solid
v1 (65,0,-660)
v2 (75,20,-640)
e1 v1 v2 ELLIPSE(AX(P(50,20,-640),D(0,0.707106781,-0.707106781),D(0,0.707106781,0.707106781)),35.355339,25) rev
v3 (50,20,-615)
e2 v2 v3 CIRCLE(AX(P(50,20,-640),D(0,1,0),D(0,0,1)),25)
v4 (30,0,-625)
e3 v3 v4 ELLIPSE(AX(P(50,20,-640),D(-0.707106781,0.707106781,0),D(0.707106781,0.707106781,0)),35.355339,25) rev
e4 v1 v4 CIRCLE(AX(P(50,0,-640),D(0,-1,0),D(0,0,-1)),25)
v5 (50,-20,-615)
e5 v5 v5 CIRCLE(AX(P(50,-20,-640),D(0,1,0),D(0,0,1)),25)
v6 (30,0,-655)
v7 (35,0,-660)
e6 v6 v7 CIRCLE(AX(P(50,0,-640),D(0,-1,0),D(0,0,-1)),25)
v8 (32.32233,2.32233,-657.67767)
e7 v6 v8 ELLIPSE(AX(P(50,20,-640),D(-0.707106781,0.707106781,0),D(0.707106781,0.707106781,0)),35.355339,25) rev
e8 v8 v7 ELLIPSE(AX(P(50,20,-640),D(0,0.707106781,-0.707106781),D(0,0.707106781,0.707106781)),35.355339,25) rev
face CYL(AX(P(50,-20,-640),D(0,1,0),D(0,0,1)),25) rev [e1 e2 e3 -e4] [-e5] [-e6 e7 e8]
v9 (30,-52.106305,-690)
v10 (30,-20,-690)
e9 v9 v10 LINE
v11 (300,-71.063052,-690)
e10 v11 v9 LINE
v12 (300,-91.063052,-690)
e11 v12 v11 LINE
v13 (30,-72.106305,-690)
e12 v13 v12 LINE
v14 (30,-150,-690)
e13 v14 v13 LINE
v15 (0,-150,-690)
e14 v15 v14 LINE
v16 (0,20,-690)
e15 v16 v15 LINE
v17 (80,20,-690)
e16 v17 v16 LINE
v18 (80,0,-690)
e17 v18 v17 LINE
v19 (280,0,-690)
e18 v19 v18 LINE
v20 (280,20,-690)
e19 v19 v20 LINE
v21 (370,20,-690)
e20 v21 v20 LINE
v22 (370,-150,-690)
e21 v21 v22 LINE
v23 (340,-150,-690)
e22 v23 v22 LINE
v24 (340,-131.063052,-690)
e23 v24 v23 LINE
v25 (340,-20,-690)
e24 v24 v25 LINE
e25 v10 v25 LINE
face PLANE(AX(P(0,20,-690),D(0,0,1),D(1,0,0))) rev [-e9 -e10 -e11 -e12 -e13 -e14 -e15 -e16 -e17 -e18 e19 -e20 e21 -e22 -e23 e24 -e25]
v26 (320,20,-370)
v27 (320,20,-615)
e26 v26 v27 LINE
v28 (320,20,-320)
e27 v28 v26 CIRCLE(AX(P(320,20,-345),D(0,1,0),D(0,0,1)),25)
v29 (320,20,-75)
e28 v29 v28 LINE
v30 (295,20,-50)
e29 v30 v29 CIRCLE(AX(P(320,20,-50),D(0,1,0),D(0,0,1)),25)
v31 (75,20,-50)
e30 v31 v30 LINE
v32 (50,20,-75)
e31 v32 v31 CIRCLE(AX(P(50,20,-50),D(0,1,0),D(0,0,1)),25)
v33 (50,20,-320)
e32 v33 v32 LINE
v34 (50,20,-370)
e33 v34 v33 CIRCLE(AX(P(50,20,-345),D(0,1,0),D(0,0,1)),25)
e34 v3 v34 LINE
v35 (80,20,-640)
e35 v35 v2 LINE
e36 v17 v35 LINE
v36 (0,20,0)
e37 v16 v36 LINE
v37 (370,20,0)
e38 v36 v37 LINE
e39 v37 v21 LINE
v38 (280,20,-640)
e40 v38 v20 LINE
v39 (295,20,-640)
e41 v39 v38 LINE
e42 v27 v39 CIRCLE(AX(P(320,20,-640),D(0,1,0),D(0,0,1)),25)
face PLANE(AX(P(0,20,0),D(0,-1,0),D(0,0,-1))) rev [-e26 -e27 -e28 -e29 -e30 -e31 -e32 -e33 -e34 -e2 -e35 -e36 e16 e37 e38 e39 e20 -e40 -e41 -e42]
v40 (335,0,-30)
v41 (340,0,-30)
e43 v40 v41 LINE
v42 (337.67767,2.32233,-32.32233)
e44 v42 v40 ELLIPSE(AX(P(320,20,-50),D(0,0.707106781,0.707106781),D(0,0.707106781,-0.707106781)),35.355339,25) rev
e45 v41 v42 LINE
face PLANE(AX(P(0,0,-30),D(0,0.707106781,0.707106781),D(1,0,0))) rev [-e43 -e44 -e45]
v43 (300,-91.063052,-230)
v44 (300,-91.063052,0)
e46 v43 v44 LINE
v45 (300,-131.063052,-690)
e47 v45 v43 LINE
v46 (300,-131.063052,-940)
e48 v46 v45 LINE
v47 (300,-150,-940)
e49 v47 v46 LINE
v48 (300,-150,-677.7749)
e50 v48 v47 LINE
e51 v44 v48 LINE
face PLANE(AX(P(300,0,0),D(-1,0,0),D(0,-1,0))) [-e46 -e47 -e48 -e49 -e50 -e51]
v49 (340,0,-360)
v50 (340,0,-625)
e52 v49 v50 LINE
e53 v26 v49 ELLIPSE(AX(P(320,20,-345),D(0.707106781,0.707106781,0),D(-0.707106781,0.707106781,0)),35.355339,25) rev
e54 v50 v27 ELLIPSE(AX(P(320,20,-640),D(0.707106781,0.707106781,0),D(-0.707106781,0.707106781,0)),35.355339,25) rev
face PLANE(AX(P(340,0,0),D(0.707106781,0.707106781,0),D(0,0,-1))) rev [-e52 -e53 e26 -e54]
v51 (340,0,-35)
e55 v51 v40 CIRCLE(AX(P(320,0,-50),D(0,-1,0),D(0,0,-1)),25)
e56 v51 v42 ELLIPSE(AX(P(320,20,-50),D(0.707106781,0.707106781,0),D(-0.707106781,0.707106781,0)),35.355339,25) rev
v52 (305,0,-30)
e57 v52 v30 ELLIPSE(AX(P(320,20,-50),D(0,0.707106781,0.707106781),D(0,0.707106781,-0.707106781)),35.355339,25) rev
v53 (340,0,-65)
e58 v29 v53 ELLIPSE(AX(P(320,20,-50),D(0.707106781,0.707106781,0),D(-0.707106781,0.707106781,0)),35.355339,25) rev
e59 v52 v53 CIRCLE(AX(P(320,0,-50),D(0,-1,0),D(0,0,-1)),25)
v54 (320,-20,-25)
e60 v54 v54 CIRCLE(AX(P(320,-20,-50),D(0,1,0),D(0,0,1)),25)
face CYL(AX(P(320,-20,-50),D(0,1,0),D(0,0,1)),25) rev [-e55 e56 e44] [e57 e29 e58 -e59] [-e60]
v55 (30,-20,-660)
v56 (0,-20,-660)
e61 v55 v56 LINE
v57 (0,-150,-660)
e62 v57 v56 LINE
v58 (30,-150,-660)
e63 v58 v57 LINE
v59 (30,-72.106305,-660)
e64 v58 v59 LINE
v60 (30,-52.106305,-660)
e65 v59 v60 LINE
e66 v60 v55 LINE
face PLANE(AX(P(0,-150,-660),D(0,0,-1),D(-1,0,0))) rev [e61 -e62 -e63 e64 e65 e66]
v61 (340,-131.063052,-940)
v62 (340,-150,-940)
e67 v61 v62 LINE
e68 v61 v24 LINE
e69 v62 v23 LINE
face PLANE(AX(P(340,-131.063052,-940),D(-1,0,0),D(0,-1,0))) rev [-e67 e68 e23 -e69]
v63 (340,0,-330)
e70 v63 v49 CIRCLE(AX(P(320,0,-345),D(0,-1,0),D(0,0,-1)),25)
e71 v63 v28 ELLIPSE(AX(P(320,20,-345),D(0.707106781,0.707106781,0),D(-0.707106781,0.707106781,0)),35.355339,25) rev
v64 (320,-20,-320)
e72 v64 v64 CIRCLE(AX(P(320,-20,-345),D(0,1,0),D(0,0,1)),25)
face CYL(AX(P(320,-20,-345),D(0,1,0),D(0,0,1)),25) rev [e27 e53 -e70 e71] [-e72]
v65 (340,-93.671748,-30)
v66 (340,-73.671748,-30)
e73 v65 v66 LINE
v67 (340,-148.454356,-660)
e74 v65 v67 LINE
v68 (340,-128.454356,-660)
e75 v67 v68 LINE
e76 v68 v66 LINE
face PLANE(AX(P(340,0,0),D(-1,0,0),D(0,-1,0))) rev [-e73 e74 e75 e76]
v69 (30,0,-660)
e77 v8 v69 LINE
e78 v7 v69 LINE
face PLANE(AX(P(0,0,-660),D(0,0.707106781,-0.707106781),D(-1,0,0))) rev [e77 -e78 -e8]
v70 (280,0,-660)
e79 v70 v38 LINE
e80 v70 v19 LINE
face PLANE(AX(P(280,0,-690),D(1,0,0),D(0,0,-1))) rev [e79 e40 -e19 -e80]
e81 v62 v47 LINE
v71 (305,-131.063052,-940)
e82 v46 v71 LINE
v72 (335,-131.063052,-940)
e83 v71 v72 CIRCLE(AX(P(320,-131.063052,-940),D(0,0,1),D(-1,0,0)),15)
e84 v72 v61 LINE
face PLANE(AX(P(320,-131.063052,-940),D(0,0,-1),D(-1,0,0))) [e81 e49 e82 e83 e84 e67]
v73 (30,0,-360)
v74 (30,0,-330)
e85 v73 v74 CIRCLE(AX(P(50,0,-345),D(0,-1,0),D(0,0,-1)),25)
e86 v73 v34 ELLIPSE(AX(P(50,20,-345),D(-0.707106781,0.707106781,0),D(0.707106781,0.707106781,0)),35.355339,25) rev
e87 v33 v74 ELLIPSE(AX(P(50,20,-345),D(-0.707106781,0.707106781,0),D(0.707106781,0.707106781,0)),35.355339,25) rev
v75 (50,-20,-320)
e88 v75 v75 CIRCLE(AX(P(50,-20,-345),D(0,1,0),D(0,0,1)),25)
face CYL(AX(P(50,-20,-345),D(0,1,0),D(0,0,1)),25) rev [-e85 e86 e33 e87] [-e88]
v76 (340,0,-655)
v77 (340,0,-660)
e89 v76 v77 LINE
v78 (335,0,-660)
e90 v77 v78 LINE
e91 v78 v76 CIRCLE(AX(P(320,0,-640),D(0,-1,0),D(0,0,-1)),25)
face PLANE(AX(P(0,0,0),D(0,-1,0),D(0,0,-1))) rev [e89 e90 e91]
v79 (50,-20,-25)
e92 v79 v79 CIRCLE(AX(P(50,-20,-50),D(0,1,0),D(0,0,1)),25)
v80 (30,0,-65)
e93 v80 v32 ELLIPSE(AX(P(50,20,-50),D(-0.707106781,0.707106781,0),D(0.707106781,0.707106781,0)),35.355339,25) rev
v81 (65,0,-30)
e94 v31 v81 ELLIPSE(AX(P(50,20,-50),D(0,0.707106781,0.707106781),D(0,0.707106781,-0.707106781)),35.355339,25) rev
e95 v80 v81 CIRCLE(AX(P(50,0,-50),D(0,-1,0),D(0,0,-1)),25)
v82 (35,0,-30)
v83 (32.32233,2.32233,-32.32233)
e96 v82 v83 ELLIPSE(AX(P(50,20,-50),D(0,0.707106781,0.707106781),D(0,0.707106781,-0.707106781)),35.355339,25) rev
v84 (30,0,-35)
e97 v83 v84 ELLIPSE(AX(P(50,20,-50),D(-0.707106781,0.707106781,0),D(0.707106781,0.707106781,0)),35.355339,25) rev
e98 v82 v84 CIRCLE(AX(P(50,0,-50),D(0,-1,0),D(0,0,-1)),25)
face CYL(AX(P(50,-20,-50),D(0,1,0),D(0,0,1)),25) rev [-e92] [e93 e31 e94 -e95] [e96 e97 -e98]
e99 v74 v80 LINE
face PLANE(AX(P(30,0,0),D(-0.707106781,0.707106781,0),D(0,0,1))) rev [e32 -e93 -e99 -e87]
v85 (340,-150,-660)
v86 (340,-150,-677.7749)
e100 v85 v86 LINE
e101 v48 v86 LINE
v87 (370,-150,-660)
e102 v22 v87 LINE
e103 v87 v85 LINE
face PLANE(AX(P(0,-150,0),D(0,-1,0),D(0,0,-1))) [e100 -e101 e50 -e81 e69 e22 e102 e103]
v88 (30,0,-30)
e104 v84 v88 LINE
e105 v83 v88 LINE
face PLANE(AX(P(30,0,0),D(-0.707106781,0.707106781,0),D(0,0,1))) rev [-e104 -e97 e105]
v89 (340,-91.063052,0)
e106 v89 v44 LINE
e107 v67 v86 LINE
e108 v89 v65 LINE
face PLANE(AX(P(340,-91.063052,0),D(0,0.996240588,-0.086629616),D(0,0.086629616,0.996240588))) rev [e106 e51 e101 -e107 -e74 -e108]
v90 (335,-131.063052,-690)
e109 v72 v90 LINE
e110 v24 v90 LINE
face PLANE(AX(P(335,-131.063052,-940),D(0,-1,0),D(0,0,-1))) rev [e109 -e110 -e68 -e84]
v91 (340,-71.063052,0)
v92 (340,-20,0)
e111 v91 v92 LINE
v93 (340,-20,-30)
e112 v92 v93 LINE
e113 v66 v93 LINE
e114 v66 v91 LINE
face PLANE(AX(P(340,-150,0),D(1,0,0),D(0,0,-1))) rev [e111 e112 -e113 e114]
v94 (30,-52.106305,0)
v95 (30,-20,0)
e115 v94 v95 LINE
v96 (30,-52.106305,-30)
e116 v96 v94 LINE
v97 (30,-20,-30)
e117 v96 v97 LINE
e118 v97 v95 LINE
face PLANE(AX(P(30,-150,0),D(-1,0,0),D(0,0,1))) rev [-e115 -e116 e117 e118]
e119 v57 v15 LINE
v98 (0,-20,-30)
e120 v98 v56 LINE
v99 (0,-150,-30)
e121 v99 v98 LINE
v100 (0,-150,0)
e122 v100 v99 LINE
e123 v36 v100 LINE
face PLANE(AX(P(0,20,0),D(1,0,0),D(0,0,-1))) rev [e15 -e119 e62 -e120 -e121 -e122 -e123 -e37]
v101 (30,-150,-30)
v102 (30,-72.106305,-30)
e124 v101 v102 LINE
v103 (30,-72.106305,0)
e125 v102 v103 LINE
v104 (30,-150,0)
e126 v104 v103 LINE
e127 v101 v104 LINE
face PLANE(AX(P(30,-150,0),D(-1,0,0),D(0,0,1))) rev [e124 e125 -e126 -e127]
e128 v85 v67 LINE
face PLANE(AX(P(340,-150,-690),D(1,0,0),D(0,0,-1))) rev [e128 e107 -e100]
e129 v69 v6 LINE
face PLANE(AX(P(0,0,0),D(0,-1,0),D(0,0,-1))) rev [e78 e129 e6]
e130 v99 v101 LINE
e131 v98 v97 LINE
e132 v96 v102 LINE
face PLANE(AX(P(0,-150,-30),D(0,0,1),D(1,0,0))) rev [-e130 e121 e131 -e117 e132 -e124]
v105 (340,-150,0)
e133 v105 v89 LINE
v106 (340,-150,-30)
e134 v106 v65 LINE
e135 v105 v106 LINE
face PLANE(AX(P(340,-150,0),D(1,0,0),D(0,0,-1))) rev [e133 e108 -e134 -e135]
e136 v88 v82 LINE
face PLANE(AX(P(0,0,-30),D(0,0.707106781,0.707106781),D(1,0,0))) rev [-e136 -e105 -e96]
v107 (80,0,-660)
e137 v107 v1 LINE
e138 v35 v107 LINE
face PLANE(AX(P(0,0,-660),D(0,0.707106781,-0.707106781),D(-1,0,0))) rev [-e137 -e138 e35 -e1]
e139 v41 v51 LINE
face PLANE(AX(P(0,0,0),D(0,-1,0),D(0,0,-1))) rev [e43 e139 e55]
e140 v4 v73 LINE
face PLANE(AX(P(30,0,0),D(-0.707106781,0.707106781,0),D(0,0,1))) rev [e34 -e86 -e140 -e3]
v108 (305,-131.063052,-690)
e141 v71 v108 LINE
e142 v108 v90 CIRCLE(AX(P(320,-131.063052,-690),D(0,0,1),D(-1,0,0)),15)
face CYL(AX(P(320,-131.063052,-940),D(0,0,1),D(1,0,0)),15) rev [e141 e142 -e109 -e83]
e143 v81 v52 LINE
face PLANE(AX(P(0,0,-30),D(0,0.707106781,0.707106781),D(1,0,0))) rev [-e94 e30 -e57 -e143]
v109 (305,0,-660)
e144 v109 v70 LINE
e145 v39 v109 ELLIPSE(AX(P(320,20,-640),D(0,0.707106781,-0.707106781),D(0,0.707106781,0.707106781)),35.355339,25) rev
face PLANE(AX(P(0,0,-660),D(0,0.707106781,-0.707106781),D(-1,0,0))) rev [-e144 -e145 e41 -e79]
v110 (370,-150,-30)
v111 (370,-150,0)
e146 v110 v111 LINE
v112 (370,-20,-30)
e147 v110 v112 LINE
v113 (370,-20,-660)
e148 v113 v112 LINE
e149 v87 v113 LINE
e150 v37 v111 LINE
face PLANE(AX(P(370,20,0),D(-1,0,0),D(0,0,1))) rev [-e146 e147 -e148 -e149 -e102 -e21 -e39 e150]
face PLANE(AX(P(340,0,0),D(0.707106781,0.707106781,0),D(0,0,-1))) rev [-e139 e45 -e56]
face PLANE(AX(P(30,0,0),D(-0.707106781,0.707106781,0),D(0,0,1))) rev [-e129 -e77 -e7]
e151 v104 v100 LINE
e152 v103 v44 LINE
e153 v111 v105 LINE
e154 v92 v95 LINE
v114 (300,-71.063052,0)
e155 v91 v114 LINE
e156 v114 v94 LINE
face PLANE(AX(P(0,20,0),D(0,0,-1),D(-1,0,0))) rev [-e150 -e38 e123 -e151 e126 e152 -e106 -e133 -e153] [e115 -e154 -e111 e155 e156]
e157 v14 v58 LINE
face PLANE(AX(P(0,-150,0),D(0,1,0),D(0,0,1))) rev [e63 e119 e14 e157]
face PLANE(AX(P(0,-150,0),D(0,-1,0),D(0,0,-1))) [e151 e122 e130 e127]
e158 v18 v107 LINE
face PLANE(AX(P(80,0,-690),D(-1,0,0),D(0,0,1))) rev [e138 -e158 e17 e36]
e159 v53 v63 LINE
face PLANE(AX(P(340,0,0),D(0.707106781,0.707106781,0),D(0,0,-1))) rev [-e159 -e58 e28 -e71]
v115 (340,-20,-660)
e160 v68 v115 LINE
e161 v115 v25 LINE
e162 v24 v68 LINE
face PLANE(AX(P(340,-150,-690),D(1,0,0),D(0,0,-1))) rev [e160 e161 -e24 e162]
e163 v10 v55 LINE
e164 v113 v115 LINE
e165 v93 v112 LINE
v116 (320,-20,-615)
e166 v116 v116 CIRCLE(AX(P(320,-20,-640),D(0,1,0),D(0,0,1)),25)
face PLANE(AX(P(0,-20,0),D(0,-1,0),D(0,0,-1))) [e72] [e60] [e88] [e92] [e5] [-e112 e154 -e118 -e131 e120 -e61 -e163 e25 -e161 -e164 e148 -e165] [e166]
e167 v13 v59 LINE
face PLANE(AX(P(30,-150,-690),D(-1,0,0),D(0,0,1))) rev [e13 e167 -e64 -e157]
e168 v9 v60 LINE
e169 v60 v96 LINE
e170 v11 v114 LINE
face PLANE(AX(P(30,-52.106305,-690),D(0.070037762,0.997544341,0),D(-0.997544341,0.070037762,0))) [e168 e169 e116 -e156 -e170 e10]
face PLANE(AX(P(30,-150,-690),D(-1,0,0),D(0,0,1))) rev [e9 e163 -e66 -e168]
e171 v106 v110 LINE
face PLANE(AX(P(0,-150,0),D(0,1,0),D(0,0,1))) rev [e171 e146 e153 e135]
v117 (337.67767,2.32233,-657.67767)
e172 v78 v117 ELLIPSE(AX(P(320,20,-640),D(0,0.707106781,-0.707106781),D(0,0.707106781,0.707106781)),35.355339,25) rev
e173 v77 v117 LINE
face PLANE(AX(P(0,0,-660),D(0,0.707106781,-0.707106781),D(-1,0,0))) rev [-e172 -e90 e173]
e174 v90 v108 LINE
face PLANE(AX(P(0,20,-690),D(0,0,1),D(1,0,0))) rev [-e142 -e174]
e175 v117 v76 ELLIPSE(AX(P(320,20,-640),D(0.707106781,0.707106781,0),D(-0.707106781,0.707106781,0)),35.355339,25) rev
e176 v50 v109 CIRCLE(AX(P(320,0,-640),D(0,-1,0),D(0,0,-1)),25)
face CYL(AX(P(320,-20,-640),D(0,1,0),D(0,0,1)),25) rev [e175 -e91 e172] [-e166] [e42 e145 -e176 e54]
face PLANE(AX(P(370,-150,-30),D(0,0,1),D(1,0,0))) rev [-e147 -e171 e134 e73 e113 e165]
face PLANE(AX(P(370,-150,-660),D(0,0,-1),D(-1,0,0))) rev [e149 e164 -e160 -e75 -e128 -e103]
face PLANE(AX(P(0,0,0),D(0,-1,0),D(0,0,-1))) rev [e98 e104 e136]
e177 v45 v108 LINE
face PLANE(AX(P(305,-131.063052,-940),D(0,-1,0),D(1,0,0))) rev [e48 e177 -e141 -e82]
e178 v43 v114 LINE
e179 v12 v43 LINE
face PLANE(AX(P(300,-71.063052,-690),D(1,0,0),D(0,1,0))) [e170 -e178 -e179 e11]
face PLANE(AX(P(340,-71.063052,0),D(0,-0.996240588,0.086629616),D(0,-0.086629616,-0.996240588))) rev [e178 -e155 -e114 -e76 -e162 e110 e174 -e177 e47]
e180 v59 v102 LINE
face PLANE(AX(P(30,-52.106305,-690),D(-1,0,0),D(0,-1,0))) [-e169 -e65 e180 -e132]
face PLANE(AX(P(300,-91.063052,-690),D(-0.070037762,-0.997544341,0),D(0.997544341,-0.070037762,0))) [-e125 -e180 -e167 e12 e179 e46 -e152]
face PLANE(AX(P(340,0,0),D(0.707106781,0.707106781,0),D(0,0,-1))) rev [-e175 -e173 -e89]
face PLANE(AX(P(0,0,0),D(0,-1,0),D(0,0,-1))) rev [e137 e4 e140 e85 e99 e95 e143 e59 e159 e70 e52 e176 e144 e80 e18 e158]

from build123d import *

# Parameters (mm, degrees)
SKETCH2_W            = 370
SKETCH2_H            = 690
SKETCH2_W_2          = 270
SKETCH2_H_2          = 590
BOSS_EXTRUDE1_DEPTH  = 20
CHAMFER1_SIZE        = 20
SKETCH10_W           = 370
SKETCH10_H           = 690
BOSS_EXTRUDE6_DEPTH  = 20
CUT_EXTRUDE3_DEPTH   = 784.964284901
SKETCH11_W           = 30
SKETCH11_H           = 30
BOSS_EXTRUDE7_DEPTH  = 130
SKETCH13_W           = 200
SKETCH13_H           = 50
CUT_EXTRUDE4_DEPTH   = 20
BOSS_EXTRUDE11_DEPTH = 690
BOSS_EXTRUDE15_DEPTH = 40
SKETCH21_W           = 0.428939058
SKETCH21_H           = 0.058642304
SKETCH21_W_2         = 75.212075904
SKETCH21_H_2         = 45.043559158
CUT_EXTRUDE6_DEPTH   = 17
BOSS_EXTRUDE16_DEPTH = 250


with BuildPart() as part:
    # Sketch2 → Boss-Extrude1 (new body)
    with BuildSketch(Plane(origin=(0, 0, 0), x_dir=(1, 0, 0), z_dir=(0, 1, 0))):
        with Locations((185, 345)):
            Rectangle(SKETCH2_W, SKETCH2_H)
        with Locations((185, 345)):
            Rectangle(SKETCH2_W_2, SKETCH2_H_2, mode=Mode.SUBTRACT)
    extrude(amount=BOSS_EXTRUDE1_DEPTH)

    # Chamfer1
    chamfer1_edges = [part.edges().sort_by_distance(p)[0] for p in [
        (185, 0, -640),
        (320, 0, -345),
        (185, 0, -50),
        (50, 0, -345),
    ]]
    chamfer(chamfer1_edges, length=CHAMFER1_SIZE - 0.0001)  # a hair under: the kernel refuses the full size

    # Sketch10 → Boss-Extrude6 (add)
    with BuildSketch(Plane.XZ):
        with Locations((185, -345)):
            Rectangle(SKETCH10_W, SKETCH10_H)
    extrude(amount=BOSS_EXTRUDE6_DEPTH)

    # Sketch4 → Cut-Extrude3 (cut, through all)
    with BuildSketch(Plane(origin=(0, 20, 0), x_dir=(1, 0, 0), z_dir=(0, 1, 0))):
        with BuildLine():
            ThreePointArc((320, 615), (337.67766953, 622.32233047), (345, 640))
            ThreePointArc((345, 640), (320, 665), (295, 640))
            Line((295, 640), (320, 640))
            Line((320, 640), (320, 615))
        make_face()
        with BuildLine():
            Line((320, 640), (295, 640))
            ThreePointArc((295, 640), (302.32233047, 622.32233047), (320, 615))
            Line((320, 615), (320, 640))
        make_face()
        with BuildLine():
            Line((50, 640), (75, 640))
            ThreePointArc((75, 640), (32.32233047, 657.67766953), (50, 615))
            Line((50, 615), (50, 640))
        make_face()
        with BuildLine():
            ThreePointArc((50, 615), (67.67766953, 622.32233047), (75, 640))
            Line((75, 640), (50, 640))
            Line((50, 640), (50, 615))
        make_face()
        with BuildLine():
            Line((50, 320), (50, 370))
            ThreePointArc((50, 370), (25, 345), (50, 320))
        make_face()
        with BuildLine():
            ThreePointArc((75, 345), (67.67766953, 362.67766953), (50, 370))
            Line((50, 370), (50, 320))
            ThreePointArc((50, 320), (67.67766953, 327.32233047), (75, 345))
        make_face()
        with BuildLine():
            Line((50, 50), (50, 75))
            ThreePointArc((50, 75), (32.32233047, 32.32233047), (75, 50))
            Line((75, 50), (50, 50))
        make_face()
        with BuildLine():
            ThreePointArc((75, 50), (67.67766953, 67.67766953), (50, 75))
            Line((50, 75), (50, 50))
            Line((50, 50), (75, 50))
        make_face()
        with BuildLine():
            Line((320, 50), (320, 75))
            ThreePointArc((320, 75), (302.32233047, 67.67766953), (295, 50))
            Line((295, 50), (320, 50))
        make_face()
        with BuildLine():
            ThreePointArc((345, 50), (337.67766953, 67.67766953), (320, 75))
            Line((320, 75), (320, 50))
            Line((320, 50), (295, 50))
            ThreePointArc((295, 50), (320, 25), (345, 50))
        make_face()
        with BuildLine():
            Line((320, 320), (320, 370))
            ThreePointArc((320, 370), (295, 345), (320, 320))
        make_face()
        with BuildLine():
            ThreePointArc((345, 345), (337.67766953, 362.67766953), (320, 370))
            Line((320, 370), (320, 320))
            ThreePointArc((320, 320), (337.67766953, 327.32233047), (345, 345))
        make_face()
    extrude(amount=-CUT_EXTRUDE3_DEPTH, mode=Mode.SUBTRACT)

    # Sketch11 → Boss-Extrude7 (add)
    with BuildSketch(Plane.XZ.offset(20)):
        with Locations((15, -15)):
            Rectangle(SKETCH11_W, SKETCH11_H)
        with Locations((355, -15)):
            Rectangle(SKETCH11_W, SKETCH11_H)
        with Locations((15, -675)):
            Rectangle(SKETCH11_W, SKETCH11_H)
        with Locations((355, -675)):
            Rectangle(SKETCH11_W, SKETCH11_H)
    extrude(amount=BOSS_EXTRUDE7_DEPTH)

    # Sketch13 → Cut-Extrude4 (cut)
    with BuildSketch(Plane(origin=(0, 20, 0), x_dir=(1, 0, 0), z_dir=(0, 1, 0))):
        with Locations((180, 665)):
            Rectangle(SKETCH13_W, SKETCH13_H)
    extrude(amount=-CUT_EXTRUDE4_DEPTH, mode=Mode.SUBTRACT)

    # Sketch14 → Boss-Extrude11 (add)
    with BuildSketch(Plane.XY):
        Polygon((30, -52.106305214), (300, -71.063052139), (300, -91.063052139), (30, -72.106305214), align=None)
    extrude(amount=-BOSS_EXTRUDE11_DEPTH)

    # Sketch19 → Boss-Extrude15 (add)
    with BuildSketch(Plane(origin=(300, 0, 0), x_dir=(0, 0, -1), z_dir=(1, 0, 0))):
        Polygon((0, -71.063052139), (690, -131.063052139), (690, -151.063052139), (0, -91.063052139), align=None)
    extrude(amount=BOSS_EXTRUDE15_DEPTH)

    # Sketch21 → Cut-Extrude6 (cut)
    with BuildSketch(Plane.XZ.offset(150)):
        with Locations((372.006097864, -651.747092541)):
            Rectangle(SKETCH21_W, SKETCH21_H)
        with Locations((331.793311609, -674.26887212)):
            Rectangle(SKETCH21_W_2, SKETCH21_H_2)
    extrude(amount=CUT_EXTRUDE6_DEPTH, mode=Mode.SUBTRACT)

    # Sketch22 → Boss-Extrude16 (add)
    with BuildSketch(Plane(origin=(0, 0, -690), x_dir=(-1, 0, 0), z_dir=(0, 0, -1))):
        with BuildLine():
            Line((-305, -131.063052139), (-300, -131.063052139))
            Line((-300, -131.063052139), (-300, -150))
            Line((-300, -150), (-340, -150))
            Line((-340, -150), (-340, -131.063052139))
            Line((-340, -131.063052139), (-335, -131.063052139))
            ThreePointArc((-335, -131.063052139), (-320, -146.063052139), (-305, -131.063052139))
        make_face()
    extrude(amount=BOSS_EXTRUDE16_DEPTH)


solid = part.part
